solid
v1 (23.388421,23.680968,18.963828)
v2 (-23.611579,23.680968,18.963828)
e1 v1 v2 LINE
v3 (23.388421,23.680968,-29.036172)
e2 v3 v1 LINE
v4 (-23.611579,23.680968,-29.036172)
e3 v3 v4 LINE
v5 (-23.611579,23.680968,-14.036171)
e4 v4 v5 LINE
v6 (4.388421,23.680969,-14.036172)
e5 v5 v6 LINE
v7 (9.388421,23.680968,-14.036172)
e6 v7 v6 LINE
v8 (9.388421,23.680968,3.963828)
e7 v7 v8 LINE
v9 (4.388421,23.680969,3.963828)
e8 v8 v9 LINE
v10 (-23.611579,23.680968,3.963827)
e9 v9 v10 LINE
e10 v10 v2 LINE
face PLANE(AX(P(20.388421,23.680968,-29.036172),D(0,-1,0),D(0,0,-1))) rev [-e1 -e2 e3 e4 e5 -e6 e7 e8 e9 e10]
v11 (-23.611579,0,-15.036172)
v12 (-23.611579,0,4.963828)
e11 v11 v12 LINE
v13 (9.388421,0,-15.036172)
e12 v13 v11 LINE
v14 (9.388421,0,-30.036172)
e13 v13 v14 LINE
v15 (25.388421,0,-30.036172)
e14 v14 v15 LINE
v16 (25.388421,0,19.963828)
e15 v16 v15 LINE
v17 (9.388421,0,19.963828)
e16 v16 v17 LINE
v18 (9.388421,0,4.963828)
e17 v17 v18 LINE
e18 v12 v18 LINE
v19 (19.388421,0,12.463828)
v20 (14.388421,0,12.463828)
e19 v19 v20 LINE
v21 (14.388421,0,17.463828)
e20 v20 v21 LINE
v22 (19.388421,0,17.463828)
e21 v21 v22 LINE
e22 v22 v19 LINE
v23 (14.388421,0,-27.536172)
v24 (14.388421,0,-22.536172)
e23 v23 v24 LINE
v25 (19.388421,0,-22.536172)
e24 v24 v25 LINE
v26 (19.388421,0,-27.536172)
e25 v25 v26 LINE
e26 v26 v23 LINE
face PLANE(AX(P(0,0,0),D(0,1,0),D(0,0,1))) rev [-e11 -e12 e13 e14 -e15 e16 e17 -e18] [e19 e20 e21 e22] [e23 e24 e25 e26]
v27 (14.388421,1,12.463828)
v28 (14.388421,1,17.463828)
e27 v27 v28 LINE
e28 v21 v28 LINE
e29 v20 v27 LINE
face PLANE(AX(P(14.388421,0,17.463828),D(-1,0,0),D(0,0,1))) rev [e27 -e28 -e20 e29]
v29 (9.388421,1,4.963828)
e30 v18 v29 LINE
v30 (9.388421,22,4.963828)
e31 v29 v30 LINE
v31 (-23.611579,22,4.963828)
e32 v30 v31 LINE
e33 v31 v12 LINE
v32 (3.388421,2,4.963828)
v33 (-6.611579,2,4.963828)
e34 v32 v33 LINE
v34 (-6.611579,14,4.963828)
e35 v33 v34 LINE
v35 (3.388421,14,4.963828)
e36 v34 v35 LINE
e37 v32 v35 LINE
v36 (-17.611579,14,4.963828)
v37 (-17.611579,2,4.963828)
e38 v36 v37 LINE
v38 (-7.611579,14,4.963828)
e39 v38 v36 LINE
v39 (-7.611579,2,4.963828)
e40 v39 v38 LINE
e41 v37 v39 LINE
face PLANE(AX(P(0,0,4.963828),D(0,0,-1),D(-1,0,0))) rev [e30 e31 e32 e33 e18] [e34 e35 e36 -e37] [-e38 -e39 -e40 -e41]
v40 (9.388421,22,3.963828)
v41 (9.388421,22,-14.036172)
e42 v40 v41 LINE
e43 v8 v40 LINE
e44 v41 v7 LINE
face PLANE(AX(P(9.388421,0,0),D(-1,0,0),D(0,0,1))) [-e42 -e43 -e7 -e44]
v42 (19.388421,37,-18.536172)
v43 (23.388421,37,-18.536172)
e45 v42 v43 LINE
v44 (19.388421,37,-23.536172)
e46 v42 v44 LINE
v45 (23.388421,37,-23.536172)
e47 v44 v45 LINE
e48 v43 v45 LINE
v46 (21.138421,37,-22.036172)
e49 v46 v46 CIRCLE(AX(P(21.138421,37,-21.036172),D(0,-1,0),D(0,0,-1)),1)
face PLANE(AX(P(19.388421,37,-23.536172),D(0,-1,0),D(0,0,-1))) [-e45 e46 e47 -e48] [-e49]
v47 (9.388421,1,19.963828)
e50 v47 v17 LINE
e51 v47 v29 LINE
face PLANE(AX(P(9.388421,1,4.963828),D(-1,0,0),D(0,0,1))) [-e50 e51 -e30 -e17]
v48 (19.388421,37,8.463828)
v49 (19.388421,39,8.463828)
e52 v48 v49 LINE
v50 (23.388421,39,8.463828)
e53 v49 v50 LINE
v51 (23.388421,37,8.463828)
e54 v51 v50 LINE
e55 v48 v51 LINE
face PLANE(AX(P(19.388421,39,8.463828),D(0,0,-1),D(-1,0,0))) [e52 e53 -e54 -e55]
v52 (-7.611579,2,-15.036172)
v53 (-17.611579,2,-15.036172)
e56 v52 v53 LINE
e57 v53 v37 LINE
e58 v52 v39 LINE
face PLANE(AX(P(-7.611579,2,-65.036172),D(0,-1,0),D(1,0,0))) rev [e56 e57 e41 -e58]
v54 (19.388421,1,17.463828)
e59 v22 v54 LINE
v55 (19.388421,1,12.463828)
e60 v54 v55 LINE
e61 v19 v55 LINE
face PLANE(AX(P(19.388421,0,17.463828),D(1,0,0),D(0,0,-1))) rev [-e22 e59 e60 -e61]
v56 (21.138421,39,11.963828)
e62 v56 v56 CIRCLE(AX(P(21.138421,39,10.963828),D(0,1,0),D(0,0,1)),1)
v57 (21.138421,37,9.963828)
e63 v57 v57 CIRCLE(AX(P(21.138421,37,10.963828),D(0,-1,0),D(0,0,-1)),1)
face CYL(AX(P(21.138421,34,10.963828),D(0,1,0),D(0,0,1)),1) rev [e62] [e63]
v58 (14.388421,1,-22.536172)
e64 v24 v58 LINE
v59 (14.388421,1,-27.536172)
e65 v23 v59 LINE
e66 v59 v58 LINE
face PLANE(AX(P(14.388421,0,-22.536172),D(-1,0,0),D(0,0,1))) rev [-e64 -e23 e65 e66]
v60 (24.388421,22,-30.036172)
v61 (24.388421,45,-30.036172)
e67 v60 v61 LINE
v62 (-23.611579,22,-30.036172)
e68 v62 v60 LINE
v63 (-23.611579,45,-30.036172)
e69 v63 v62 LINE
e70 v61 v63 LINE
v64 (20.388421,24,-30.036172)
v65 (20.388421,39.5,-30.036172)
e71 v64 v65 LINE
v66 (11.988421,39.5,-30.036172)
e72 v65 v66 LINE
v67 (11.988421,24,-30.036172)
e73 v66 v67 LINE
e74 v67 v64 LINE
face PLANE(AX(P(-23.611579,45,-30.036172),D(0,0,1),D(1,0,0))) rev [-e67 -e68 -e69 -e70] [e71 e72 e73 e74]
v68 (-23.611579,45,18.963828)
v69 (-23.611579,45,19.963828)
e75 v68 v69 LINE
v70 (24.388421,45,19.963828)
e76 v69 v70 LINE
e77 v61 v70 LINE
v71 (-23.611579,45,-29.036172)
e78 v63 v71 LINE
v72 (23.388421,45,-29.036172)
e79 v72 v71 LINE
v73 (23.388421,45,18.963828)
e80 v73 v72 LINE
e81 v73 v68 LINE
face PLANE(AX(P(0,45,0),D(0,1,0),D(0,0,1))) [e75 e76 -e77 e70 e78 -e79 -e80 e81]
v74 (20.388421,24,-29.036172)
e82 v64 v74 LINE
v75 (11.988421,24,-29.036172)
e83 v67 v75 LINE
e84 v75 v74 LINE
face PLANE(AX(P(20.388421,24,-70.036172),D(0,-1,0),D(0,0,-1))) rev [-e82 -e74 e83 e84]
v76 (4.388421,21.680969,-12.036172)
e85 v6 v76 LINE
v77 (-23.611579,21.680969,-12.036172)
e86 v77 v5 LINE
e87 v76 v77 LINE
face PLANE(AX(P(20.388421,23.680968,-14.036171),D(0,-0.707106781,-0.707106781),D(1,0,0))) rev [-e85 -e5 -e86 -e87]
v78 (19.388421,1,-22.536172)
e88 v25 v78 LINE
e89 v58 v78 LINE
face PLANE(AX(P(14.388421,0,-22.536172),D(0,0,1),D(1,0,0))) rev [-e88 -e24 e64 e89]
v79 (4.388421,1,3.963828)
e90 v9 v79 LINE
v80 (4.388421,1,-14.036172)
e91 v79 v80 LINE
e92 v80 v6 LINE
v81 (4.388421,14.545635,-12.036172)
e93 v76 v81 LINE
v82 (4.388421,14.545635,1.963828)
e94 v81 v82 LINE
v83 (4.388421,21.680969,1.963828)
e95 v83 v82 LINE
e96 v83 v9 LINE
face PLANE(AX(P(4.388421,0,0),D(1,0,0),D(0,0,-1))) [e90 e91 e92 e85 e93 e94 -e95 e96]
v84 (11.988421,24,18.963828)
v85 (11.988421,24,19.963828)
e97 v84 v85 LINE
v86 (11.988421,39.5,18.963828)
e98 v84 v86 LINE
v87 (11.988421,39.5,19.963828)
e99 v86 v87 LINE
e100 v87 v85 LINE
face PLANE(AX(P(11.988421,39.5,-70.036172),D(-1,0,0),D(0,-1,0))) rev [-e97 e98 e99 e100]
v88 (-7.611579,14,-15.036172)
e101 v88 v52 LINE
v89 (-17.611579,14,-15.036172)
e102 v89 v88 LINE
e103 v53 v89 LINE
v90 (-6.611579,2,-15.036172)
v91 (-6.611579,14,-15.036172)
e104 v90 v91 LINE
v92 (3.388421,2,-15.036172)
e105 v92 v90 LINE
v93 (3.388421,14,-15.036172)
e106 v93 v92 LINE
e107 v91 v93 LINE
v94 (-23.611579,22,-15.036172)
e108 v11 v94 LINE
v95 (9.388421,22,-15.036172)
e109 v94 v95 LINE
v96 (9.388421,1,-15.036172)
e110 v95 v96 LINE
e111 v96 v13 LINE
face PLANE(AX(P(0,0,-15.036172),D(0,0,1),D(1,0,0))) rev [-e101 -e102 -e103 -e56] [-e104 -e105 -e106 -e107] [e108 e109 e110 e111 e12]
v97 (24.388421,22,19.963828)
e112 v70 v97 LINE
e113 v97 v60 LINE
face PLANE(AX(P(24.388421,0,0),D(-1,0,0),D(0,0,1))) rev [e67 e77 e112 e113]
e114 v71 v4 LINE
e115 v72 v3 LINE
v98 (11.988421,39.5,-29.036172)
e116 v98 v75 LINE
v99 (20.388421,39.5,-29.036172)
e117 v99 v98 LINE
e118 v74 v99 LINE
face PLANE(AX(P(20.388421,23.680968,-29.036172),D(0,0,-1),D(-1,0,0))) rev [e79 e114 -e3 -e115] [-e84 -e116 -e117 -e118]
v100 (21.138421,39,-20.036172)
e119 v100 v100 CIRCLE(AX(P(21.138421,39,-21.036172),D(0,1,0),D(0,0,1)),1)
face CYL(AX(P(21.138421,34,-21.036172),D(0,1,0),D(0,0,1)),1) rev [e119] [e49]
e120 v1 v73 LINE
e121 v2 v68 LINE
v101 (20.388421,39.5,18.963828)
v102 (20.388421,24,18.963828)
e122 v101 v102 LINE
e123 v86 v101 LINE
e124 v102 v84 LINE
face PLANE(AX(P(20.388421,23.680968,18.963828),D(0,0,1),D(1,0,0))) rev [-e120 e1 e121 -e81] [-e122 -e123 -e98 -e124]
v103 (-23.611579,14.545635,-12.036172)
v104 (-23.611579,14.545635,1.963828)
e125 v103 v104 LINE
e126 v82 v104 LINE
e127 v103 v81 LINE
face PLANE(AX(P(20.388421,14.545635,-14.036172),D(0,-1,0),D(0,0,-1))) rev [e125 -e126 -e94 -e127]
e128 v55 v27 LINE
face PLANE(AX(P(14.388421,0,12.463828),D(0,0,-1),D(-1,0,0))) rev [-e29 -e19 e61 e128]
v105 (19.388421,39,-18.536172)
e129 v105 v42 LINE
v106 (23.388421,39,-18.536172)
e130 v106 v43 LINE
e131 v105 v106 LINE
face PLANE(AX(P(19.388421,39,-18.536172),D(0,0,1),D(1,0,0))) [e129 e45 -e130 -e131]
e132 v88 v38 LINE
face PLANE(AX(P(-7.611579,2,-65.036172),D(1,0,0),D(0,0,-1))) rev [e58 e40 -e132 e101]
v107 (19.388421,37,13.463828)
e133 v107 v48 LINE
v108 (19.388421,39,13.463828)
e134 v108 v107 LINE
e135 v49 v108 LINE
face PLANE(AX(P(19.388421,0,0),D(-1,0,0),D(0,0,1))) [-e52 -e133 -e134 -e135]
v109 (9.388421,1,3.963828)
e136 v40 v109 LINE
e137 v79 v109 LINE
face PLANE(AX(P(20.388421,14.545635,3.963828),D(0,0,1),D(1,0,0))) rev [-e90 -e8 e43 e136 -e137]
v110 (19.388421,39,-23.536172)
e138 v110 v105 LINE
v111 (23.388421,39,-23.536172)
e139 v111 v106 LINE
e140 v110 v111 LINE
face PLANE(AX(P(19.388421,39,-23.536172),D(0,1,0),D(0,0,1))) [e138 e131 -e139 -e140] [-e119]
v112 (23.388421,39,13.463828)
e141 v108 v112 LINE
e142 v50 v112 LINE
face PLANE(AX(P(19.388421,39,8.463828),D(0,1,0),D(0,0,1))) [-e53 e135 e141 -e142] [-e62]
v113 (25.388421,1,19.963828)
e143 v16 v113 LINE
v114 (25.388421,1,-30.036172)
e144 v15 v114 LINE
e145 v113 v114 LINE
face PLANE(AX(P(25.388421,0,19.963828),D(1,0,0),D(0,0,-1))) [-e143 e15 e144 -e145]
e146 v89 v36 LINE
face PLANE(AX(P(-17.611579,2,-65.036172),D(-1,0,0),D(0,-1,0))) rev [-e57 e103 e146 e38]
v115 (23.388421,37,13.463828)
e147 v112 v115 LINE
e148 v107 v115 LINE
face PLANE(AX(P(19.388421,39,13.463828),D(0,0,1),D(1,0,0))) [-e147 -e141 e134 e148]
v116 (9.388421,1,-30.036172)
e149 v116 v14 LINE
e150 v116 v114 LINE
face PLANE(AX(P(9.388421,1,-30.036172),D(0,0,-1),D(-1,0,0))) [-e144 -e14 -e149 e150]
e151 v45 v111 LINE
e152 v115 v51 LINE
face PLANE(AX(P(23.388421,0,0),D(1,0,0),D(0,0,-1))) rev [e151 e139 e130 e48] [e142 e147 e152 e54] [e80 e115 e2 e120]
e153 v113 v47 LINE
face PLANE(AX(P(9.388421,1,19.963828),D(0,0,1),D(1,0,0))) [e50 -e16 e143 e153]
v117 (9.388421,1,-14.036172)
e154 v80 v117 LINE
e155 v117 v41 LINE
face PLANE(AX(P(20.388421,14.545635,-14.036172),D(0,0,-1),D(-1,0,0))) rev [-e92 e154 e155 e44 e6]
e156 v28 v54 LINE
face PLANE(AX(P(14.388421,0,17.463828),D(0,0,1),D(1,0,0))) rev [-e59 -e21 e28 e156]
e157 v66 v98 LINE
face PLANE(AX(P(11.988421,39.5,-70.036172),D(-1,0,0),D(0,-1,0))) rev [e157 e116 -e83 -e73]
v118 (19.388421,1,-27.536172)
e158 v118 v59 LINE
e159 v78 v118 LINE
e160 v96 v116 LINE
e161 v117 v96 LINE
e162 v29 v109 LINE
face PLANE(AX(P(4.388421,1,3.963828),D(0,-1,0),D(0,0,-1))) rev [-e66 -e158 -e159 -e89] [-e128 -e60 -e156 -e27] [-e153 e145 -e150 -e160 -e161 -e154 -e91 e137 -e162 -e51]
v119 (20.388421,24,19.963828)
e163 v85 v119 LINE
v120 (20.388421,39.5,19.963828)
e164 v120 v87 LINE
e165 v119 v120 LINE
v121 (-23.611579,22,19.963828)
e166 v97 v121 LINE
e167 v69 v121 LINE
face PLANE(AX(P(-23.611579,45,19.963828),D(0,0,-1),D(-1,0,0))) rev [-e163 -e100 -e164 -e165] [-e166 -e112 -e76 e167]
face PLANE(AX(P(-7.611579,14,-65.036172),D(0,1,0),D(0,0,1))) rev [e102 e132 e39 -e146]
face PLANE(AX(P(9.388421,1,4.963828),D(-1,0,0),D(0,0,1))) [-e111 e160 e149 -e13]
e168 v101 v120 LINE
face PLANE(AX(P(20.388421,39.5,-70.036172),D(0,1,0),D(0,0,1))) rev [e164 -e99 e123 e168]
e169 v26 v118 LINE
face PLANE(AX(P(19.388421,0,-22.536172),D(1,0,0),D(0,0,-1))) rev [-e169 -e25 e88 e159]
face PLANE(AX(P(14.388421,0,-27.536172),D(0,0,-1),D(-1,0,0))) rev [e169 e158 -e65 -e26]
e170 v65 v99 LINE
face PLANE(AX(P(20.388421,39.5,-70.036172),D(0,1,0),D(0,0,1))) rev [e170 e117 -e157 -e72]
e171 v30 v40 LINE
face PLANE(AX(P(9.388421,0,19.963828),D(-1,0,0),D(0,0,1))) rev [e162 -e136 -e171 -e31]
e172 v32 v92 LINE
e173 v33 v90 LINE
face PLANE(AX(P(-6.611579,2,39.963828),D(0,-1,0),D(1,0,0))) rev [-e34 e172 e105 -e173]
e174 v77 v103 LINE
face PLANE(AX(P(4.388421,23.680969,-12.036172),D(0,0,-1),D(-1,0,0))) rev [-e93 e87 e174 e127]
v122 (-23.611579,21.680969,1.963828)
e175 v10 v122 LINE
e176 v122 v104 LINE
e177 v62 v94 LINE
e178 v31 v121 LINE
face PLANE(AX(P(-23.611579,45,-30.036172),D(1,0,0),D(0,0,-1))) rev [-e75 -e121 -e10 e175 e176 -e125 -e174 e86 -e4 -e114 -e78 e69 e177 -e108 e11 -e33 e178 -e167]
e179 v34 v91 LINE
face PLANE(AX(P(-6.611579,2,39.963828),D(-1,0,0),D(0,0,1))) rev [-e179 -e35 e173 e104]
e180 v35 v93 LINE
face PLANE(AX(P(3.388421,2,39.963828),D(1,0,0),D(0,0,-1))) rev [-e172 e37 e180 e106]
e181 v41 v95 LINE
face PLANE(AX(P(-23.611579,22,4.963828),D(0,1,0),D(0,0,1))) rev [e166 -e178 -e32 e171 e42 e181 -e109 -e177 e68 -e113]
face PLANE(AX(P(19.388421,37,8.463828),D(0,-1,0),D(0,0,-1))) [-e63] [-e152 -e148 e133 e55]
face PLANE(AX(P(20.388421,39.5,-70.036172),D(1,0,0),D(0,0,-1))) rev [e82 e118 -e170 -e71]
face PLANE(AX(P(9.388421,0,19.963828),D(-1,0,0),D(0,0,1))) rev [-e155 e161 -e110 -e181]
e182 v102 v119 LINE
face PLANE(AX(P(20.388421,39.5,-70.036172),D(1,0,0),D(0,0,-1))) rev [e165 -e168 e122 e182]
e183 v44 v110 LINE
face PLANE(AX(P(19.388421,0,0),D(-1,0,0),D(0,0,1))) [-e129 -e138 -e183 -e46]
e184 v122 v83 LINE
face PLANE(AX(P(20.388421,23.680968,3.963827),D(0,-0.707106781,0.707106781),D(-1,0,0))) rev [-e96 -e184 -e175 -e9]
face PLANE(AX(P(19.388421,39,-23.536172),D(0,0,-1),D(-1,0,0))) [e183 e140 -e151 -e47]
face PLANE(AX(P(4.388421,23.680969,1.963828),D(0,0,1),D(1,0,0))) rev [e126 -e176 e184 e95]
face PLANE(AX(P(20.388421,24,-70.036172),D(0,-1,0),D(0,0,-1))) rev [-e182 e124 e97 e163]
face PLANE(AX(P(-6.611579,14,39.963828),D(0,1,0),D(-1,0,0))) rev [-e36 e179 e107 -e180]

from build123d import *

# Parameters (mm, degrees)
SKETCH1_W           = 45
SKETCH1_H           = 50
BOSS_EXTRUDE1_DEPTH = 45
SKETCH2_W           = 22
SKETCH2_H           = 22
CUT_EXTRUDE2_DEPTH  = 15
SKETCH3_W           = 10
SKETCH3_H           = 12
CUT_EXTRUDE3_DEPTH  = 70
SKETCH4_W           = 10
SKETCH4_H           = 12
CUT_EXTRUDE4_DEPTH  = 70
SKETCH5_W           = 22
SKETCH5_H           = 22
CUT_EXTRUDE5_DEPTH  = 15
SKETCH6_W           = 15
SKETCH6_H           = 21.883389701
CUT_EXTRUDE6_DEPTH  = 15
SKETCH7_W           = 5
SKETCH7_H           = 22
CUT_EXTRUDE7_DEPTH  = 15
SKETCH8_W           = 48
SKETCH8_H           = 21.319032177
CUT_EXTRUDE8_DEPTH  = 44
SKETCH9_W           = 15
SKETCH9_H           = 0.116610299
CUT_EXTRUDE9_DEPTH  = 44
SKETCH10_W          = 18
SKETCH10_H          = 9.135333164
CUT_EXTRUDE10_DEPTH = 44
SKETCH11_W          = 12
SKETCH11_H          = 45
CUT_EXTRUDE11_DEPTH = 50
SKETCH12_W          = 15
SKETCH12_H          = 22
CUT_EXTRUDE12_DEPTH = 10
SKETCH14_W          = 18
SKETCH14_H          = 13.545634659
CUT_EXTRUDE17_DEPTH = 5
BOSS_EXTRUDE2_DEPTH = 1
SKETCH18_W          = 16
SKETCH18_H          = 50
BOSS_EXTRUDE3_DEPTH = 1
SKETCH19_W          = 5
SKETCH19_H          = 5
CUT_EXTRUDE18_DEPTH = 1
SKETCH21_W          = 50
SKETCH21_H          = 23
BOSS_EXTRUDE4_DEPTH = 15
SKETCH22_W          = 8.4
SKETCH22_H          = 15.5
CUT_EXTRUDE21_DEPTH = 90
SKETCH24_W          = 48
SKETCH24_H          = 21.319032177
CUT_EXTRUDE22_DEPTH = 14
SKETCH25_W          = 28
SKETCH25_H          = 2
BOSS_EXTRUDE5_DEPTH = 9.135334
CHAMFER1_SIZE       = 2
SKETCH26_W          = 5
SKETCH26_H          = 2
BOSS_EXTRUDE7_DEPTH = 5
SKETCH27_R          = 1
CUT_EXTRUDE23_DEPTH = 5


with BuildPart() as part:
    # Sketch1 → Boss-Extrude1 (new body)
    with BuildSketch(Plane(origin=(0, 0, 0), x_dir=(1, 0, 0), z_dir=(0, 1, 0))):
        with Locations((-1.111578991, 5.036171713)):
            Rectangle(SKETCH1_W, SKETCH1_H)
    extrude(amount=BOSS_EXTRUDE1_DEPTH)

    # Sketch2 → Cut-Extrude2 (cut)
    with BuildSketch(Plane.XY.offset(19.963828287)):
        with Locations((-12.611578991, 11)):
            Rectangle(SKETCH2_W, SKETCH2_H)
    extrude(amount=-CUT_EXTRUDE2_DEPTH, mode=Mode.SUBTRACT)

    # Sketch3 → Cut-Extrude3 (cut)
    with BuildSketch(Plane.XY.offset(4.963828287)):
        with Locations((-12.611578991, 8)):
            Rectangle(SKETCH3_W, SKETCH3_H)
    extrude(amount=-CUT_EXTRUDE3_DEPTH, mode=Mode.SUBTRACT)

    # Sketch4 → Cut-Extrude4 (cut)
    with BuildSketch(Plane(origin=(0, 0, -30.036171713), x_dir=(-1, 0, 0), z_dir=(0, 0, -1))):
        with Locations((1.611578991, 8)):
            Rectangle(SKETCH4_W, SKETCH4_H)
    extrude(amount=-CUT_EXTRUDE4_DEPTH, mode=Mode.SUBTRACT)

    # Sketch5 → Cut-Extrude5 (cut)
    with BuildSketch(Plane(origin=(0, 0, -30.036171713), x_dir=(-1, 0, 0), z_dir=(0, 0, -1))):
        with Locations((1.611578991, 11)):
            Rectangle(SKETCH5_W, SKETCH5_H)
    extrude(amount=-CUT_EXTRUDE5_DEPTH, mode=Mode.SUBTRACT)

    # Sketch6 → Cut-Extrude6 (cut)
    with BuildSketch(Plane.ZY.offset(23.611578991)):
        with Locations((-22.536171713, 10.941694851)):
            Rectangle(SKETCH6_W, SKETCH6_H)
    extrude(amount=-CUT_EXTRUDE6_DEPTH, mode=Mode.SUBTRACT)

    # Sketch7 → Cut-Extrude7 (cut)
    with BuildSketch(Plane.XY.offset(19.963828287)):
        with Locations((0.888421009, 11)):
            Rectangle(SKETCH7_W, SKETCH7_H)
    extrude(amount=-CUT_EXTRUDE7_DEPTH, mode=Mode.SUBTRACT)

    # Sketch8 → Cut-Extrude8 (cut)
    with BuildSketch(Plane.ZY.offset(23.611578991)):
        with Locations((-5.036171713, 34.340483912)):
            Rectangle(SKETCH8_W, SKETCH8_H)
    extrude(amount=-CUT_EXTRUDE8_DEPTH, mode=Mode.SUBTRACT)

    # Sketch9 → Cut-Extrude9 (cut)
    with BuildSketch(Plane(origin=(-12.611578991, 0, 0), x_dir=(0, 0, -1), z_dir=(1, 0, 0))):
        with Locations((22.536171713, 21.94169485)):
            Rectangle(SKETCH9_W, SKETCH9_H)
    extrude(amount=-CUT_EXTRUDE9_DEPTH, mode=Mode.SUBTRACT)

    # Sketch10 → Cut-Extrude10 (cut)
    with BuildSketch(Plane.ZY.offset(23.611578991)):
        with Locations((-5.036171713, 19.113301241)):
            Rectangle(SKETCH10_W, SKETCH10_H)
    extrude(amount=-CUT_EXTRUDE10_DEPTH, mode=Mode.SUBTRACT)

    # Sketch11 → Cut-Extrude11 (cut)
    with BuildSketch(Plane(origin=(0, 0, -30.036171713), x_dir=(-1, 0, 0), z_dir=(0, 0, -1))):
        with Locations((-15.388421009, 22.5)):
            Rectangle(SKETCH11_W, SKETCH11_H)
    extrude(amount=-CUT_EXTRUDE11_DEPTH, mode=Mode.SUBTRACT)

    # Sketch12 → Cut-Extrude12 (cut)
    with BuildSketch(Plane(origin=(9.388421009, 0, 0), x_dir=(0, 0, -1), z_dir=(1, 0, 0))):
        with Locations((-12.463828287, 11)):
            Rectangle(SKETCH12_W, SKETCH12_H)
    extrude(amount=-CUT_EXTRUDE12_DEPTH, mode=Mode.SUBTRACT)

    # Sketch14 → Cut-Extrude17 (cut)
    with BuildSketch(Plane(origin=(9.388421009, 0, 0), x_dir=(0, 0, -1), z_dir=(1, 0, 0))):
        with Locations((5.036171713, 7.77281733)):
            Rectangle(SKETCH14_W, SKETCH14_H)
    extrude(amount=-CUT_EXTRUDE17_DEPTH, mode=Mode.SUBTRACT)

    # Sketch16 → Boss-Extrude2 (add)
    with BuildSketch(Plane(origin=(0, 0, 0), x_dir=(-1, 0, 0), z_dir=(0, -1, 0))):
        Polygon((-9.388421009, -4.963828287), (-9.388421009, 30.036171713), (-25.285959903, 30.036171713), (-25.285959903, -1.106934493), (-25.285959903, -19.963828287), (-9.388421009, -19.963828287), align=None)
    extrude(amount=-BOSS_EXTRUDE2_DEPTH)

    # Sketch18 → Boss-Extrude3 (add)
    with BuildSketch(Plane(origin=(0, 1, 0), x_dir=(1, 0, 0), z_dir=(0, 1, 0))):
        with Locations((17.388421009, 5.036171713)):
            Rectangle(SKETCH18_W, SKETCH18_H)
    extrude(amount=-BOSS_EXTRUDE3_DEPTH)

    # Sketch19 → Cut-Extrude18 (cut)
    with BuildSketch(Plane(origin=(0, 1, 0), x_dir=(1, 0, 0), z_dir=(0, 1, 0))):
        with Locations((16.888421009, -14.963828287)):
            Rectangle(SKETCH19_W, SKETCH19_H)
        with Locations((16.888421009, 25.036171713)):
            Rectangle(SKETCH19_W, SKETCH19_H)
    extrude(amount=-CUT_EXTRUDE18_DEPTH, mode=Mode.SUBTRACT)

    # Sketch21 → Boss-Extrude4 (add)
    with BuildSketch(Plane(origin=(9.388421009, 0, 0), x_dir=(0, 0, -1), z_dir=(1, 0, 0))):
        with Locations((5.036171713, 33.5)):
            Rectangle(SKETCH21_W, SKETCH21_H)
    extrude(amount=BOSS_EXTRUDE4_DEPTH)

    # Sketch22 → Cut-Extrude21 (cut)
    with BuildSketch(Plane.XY.offset(19.963828287)):
        with Locations((16.188421009, 31.75)):
            Rectangle(SKETCH22_W, SKETCH22_H)
    extrude(amount=-CUT_EXTRUDE21_DEPTH, mode=Mode.SUBTRACT)

    # Sketch24 → Cut-Extrude22 (cut)
    with BuildSketch(Plane.ZY.offset(-9.388421009)):
        with Locations((-5.036171713, 34.340483912)):
            Rectangle(SKETCH24_W, SKETCH24_H)
    extrude(amount=-CUT_EXTRUDE22_DEPTH, mode=Mode.SUBTRACT)

    # Sketch25 → Boss-Extrude5 (add)
    with BuildSketch(Plane(origin=(0, 14.545634659, 0), x_dir=(1, 0, 0), z_dir=(0, 1, 0))):
        with Locations((-9.611578991, 13.036171713)):
            Rectangle(SKETCH25_W, SKETCH25_H)
        with Locations((-9.611578991, -2.963828287)):
            Rectangle(SKETCH25_W, SKETCH25_H)
    extrude(amount=BOSS_EXTRUDE5_DEPTH)

    # Chamfer1
    chamfer1_edges = [part.edges().sort_by_distance(p)[0] for p in [
        (-9.611578991, 23.680968659, 1.963828287),
        (-9.611578991, 23.680968659, -12.036171713),
    ]]
    chamfer(chamfer1_edges, length=CHAMFER1_SIZE - 0.0001)  # a hair under: the kernel refuses the full size

    # Sketch26 → Boss-Extrude7 (add)
    with BuildSketch(Plane(origin=(24.388421009, 0, 0), x_dir=(0, 0, -1), z_dir=(1, 0, 0))):
        with Locations((21.036171713, 38)):
            Rectangle(SKETCH26_W, SKETCH26_H)
        with Locations((-10.963828287, 38)):
            Rectangle(SKETCH26_W, SKETCH26_H)
    extrude(amount=-BOSS_EXTRUDE7_DEPTH)

    # Sketch27 → Cut-Extrude23 (cut)
    with BuildSketch(Plane(origin=(0, 39, 0), x_dir=(1, 0, 0), z_dir=(0, 1, 0))):
        with Locations(Location((21.138421009, -10.963828287, 0), (0, 0, 270))):
            Circle(SKETCH27_R)
        with Locations(Location((21.138421009, 21.036171713, 0), (0, 0, 270))):
            Circle(SKETCH27_R)
    extrude(amount=-CUT_EXTRUDE23_DEPTH, mode=Mode.SUBTRACT)


solid = part.part
